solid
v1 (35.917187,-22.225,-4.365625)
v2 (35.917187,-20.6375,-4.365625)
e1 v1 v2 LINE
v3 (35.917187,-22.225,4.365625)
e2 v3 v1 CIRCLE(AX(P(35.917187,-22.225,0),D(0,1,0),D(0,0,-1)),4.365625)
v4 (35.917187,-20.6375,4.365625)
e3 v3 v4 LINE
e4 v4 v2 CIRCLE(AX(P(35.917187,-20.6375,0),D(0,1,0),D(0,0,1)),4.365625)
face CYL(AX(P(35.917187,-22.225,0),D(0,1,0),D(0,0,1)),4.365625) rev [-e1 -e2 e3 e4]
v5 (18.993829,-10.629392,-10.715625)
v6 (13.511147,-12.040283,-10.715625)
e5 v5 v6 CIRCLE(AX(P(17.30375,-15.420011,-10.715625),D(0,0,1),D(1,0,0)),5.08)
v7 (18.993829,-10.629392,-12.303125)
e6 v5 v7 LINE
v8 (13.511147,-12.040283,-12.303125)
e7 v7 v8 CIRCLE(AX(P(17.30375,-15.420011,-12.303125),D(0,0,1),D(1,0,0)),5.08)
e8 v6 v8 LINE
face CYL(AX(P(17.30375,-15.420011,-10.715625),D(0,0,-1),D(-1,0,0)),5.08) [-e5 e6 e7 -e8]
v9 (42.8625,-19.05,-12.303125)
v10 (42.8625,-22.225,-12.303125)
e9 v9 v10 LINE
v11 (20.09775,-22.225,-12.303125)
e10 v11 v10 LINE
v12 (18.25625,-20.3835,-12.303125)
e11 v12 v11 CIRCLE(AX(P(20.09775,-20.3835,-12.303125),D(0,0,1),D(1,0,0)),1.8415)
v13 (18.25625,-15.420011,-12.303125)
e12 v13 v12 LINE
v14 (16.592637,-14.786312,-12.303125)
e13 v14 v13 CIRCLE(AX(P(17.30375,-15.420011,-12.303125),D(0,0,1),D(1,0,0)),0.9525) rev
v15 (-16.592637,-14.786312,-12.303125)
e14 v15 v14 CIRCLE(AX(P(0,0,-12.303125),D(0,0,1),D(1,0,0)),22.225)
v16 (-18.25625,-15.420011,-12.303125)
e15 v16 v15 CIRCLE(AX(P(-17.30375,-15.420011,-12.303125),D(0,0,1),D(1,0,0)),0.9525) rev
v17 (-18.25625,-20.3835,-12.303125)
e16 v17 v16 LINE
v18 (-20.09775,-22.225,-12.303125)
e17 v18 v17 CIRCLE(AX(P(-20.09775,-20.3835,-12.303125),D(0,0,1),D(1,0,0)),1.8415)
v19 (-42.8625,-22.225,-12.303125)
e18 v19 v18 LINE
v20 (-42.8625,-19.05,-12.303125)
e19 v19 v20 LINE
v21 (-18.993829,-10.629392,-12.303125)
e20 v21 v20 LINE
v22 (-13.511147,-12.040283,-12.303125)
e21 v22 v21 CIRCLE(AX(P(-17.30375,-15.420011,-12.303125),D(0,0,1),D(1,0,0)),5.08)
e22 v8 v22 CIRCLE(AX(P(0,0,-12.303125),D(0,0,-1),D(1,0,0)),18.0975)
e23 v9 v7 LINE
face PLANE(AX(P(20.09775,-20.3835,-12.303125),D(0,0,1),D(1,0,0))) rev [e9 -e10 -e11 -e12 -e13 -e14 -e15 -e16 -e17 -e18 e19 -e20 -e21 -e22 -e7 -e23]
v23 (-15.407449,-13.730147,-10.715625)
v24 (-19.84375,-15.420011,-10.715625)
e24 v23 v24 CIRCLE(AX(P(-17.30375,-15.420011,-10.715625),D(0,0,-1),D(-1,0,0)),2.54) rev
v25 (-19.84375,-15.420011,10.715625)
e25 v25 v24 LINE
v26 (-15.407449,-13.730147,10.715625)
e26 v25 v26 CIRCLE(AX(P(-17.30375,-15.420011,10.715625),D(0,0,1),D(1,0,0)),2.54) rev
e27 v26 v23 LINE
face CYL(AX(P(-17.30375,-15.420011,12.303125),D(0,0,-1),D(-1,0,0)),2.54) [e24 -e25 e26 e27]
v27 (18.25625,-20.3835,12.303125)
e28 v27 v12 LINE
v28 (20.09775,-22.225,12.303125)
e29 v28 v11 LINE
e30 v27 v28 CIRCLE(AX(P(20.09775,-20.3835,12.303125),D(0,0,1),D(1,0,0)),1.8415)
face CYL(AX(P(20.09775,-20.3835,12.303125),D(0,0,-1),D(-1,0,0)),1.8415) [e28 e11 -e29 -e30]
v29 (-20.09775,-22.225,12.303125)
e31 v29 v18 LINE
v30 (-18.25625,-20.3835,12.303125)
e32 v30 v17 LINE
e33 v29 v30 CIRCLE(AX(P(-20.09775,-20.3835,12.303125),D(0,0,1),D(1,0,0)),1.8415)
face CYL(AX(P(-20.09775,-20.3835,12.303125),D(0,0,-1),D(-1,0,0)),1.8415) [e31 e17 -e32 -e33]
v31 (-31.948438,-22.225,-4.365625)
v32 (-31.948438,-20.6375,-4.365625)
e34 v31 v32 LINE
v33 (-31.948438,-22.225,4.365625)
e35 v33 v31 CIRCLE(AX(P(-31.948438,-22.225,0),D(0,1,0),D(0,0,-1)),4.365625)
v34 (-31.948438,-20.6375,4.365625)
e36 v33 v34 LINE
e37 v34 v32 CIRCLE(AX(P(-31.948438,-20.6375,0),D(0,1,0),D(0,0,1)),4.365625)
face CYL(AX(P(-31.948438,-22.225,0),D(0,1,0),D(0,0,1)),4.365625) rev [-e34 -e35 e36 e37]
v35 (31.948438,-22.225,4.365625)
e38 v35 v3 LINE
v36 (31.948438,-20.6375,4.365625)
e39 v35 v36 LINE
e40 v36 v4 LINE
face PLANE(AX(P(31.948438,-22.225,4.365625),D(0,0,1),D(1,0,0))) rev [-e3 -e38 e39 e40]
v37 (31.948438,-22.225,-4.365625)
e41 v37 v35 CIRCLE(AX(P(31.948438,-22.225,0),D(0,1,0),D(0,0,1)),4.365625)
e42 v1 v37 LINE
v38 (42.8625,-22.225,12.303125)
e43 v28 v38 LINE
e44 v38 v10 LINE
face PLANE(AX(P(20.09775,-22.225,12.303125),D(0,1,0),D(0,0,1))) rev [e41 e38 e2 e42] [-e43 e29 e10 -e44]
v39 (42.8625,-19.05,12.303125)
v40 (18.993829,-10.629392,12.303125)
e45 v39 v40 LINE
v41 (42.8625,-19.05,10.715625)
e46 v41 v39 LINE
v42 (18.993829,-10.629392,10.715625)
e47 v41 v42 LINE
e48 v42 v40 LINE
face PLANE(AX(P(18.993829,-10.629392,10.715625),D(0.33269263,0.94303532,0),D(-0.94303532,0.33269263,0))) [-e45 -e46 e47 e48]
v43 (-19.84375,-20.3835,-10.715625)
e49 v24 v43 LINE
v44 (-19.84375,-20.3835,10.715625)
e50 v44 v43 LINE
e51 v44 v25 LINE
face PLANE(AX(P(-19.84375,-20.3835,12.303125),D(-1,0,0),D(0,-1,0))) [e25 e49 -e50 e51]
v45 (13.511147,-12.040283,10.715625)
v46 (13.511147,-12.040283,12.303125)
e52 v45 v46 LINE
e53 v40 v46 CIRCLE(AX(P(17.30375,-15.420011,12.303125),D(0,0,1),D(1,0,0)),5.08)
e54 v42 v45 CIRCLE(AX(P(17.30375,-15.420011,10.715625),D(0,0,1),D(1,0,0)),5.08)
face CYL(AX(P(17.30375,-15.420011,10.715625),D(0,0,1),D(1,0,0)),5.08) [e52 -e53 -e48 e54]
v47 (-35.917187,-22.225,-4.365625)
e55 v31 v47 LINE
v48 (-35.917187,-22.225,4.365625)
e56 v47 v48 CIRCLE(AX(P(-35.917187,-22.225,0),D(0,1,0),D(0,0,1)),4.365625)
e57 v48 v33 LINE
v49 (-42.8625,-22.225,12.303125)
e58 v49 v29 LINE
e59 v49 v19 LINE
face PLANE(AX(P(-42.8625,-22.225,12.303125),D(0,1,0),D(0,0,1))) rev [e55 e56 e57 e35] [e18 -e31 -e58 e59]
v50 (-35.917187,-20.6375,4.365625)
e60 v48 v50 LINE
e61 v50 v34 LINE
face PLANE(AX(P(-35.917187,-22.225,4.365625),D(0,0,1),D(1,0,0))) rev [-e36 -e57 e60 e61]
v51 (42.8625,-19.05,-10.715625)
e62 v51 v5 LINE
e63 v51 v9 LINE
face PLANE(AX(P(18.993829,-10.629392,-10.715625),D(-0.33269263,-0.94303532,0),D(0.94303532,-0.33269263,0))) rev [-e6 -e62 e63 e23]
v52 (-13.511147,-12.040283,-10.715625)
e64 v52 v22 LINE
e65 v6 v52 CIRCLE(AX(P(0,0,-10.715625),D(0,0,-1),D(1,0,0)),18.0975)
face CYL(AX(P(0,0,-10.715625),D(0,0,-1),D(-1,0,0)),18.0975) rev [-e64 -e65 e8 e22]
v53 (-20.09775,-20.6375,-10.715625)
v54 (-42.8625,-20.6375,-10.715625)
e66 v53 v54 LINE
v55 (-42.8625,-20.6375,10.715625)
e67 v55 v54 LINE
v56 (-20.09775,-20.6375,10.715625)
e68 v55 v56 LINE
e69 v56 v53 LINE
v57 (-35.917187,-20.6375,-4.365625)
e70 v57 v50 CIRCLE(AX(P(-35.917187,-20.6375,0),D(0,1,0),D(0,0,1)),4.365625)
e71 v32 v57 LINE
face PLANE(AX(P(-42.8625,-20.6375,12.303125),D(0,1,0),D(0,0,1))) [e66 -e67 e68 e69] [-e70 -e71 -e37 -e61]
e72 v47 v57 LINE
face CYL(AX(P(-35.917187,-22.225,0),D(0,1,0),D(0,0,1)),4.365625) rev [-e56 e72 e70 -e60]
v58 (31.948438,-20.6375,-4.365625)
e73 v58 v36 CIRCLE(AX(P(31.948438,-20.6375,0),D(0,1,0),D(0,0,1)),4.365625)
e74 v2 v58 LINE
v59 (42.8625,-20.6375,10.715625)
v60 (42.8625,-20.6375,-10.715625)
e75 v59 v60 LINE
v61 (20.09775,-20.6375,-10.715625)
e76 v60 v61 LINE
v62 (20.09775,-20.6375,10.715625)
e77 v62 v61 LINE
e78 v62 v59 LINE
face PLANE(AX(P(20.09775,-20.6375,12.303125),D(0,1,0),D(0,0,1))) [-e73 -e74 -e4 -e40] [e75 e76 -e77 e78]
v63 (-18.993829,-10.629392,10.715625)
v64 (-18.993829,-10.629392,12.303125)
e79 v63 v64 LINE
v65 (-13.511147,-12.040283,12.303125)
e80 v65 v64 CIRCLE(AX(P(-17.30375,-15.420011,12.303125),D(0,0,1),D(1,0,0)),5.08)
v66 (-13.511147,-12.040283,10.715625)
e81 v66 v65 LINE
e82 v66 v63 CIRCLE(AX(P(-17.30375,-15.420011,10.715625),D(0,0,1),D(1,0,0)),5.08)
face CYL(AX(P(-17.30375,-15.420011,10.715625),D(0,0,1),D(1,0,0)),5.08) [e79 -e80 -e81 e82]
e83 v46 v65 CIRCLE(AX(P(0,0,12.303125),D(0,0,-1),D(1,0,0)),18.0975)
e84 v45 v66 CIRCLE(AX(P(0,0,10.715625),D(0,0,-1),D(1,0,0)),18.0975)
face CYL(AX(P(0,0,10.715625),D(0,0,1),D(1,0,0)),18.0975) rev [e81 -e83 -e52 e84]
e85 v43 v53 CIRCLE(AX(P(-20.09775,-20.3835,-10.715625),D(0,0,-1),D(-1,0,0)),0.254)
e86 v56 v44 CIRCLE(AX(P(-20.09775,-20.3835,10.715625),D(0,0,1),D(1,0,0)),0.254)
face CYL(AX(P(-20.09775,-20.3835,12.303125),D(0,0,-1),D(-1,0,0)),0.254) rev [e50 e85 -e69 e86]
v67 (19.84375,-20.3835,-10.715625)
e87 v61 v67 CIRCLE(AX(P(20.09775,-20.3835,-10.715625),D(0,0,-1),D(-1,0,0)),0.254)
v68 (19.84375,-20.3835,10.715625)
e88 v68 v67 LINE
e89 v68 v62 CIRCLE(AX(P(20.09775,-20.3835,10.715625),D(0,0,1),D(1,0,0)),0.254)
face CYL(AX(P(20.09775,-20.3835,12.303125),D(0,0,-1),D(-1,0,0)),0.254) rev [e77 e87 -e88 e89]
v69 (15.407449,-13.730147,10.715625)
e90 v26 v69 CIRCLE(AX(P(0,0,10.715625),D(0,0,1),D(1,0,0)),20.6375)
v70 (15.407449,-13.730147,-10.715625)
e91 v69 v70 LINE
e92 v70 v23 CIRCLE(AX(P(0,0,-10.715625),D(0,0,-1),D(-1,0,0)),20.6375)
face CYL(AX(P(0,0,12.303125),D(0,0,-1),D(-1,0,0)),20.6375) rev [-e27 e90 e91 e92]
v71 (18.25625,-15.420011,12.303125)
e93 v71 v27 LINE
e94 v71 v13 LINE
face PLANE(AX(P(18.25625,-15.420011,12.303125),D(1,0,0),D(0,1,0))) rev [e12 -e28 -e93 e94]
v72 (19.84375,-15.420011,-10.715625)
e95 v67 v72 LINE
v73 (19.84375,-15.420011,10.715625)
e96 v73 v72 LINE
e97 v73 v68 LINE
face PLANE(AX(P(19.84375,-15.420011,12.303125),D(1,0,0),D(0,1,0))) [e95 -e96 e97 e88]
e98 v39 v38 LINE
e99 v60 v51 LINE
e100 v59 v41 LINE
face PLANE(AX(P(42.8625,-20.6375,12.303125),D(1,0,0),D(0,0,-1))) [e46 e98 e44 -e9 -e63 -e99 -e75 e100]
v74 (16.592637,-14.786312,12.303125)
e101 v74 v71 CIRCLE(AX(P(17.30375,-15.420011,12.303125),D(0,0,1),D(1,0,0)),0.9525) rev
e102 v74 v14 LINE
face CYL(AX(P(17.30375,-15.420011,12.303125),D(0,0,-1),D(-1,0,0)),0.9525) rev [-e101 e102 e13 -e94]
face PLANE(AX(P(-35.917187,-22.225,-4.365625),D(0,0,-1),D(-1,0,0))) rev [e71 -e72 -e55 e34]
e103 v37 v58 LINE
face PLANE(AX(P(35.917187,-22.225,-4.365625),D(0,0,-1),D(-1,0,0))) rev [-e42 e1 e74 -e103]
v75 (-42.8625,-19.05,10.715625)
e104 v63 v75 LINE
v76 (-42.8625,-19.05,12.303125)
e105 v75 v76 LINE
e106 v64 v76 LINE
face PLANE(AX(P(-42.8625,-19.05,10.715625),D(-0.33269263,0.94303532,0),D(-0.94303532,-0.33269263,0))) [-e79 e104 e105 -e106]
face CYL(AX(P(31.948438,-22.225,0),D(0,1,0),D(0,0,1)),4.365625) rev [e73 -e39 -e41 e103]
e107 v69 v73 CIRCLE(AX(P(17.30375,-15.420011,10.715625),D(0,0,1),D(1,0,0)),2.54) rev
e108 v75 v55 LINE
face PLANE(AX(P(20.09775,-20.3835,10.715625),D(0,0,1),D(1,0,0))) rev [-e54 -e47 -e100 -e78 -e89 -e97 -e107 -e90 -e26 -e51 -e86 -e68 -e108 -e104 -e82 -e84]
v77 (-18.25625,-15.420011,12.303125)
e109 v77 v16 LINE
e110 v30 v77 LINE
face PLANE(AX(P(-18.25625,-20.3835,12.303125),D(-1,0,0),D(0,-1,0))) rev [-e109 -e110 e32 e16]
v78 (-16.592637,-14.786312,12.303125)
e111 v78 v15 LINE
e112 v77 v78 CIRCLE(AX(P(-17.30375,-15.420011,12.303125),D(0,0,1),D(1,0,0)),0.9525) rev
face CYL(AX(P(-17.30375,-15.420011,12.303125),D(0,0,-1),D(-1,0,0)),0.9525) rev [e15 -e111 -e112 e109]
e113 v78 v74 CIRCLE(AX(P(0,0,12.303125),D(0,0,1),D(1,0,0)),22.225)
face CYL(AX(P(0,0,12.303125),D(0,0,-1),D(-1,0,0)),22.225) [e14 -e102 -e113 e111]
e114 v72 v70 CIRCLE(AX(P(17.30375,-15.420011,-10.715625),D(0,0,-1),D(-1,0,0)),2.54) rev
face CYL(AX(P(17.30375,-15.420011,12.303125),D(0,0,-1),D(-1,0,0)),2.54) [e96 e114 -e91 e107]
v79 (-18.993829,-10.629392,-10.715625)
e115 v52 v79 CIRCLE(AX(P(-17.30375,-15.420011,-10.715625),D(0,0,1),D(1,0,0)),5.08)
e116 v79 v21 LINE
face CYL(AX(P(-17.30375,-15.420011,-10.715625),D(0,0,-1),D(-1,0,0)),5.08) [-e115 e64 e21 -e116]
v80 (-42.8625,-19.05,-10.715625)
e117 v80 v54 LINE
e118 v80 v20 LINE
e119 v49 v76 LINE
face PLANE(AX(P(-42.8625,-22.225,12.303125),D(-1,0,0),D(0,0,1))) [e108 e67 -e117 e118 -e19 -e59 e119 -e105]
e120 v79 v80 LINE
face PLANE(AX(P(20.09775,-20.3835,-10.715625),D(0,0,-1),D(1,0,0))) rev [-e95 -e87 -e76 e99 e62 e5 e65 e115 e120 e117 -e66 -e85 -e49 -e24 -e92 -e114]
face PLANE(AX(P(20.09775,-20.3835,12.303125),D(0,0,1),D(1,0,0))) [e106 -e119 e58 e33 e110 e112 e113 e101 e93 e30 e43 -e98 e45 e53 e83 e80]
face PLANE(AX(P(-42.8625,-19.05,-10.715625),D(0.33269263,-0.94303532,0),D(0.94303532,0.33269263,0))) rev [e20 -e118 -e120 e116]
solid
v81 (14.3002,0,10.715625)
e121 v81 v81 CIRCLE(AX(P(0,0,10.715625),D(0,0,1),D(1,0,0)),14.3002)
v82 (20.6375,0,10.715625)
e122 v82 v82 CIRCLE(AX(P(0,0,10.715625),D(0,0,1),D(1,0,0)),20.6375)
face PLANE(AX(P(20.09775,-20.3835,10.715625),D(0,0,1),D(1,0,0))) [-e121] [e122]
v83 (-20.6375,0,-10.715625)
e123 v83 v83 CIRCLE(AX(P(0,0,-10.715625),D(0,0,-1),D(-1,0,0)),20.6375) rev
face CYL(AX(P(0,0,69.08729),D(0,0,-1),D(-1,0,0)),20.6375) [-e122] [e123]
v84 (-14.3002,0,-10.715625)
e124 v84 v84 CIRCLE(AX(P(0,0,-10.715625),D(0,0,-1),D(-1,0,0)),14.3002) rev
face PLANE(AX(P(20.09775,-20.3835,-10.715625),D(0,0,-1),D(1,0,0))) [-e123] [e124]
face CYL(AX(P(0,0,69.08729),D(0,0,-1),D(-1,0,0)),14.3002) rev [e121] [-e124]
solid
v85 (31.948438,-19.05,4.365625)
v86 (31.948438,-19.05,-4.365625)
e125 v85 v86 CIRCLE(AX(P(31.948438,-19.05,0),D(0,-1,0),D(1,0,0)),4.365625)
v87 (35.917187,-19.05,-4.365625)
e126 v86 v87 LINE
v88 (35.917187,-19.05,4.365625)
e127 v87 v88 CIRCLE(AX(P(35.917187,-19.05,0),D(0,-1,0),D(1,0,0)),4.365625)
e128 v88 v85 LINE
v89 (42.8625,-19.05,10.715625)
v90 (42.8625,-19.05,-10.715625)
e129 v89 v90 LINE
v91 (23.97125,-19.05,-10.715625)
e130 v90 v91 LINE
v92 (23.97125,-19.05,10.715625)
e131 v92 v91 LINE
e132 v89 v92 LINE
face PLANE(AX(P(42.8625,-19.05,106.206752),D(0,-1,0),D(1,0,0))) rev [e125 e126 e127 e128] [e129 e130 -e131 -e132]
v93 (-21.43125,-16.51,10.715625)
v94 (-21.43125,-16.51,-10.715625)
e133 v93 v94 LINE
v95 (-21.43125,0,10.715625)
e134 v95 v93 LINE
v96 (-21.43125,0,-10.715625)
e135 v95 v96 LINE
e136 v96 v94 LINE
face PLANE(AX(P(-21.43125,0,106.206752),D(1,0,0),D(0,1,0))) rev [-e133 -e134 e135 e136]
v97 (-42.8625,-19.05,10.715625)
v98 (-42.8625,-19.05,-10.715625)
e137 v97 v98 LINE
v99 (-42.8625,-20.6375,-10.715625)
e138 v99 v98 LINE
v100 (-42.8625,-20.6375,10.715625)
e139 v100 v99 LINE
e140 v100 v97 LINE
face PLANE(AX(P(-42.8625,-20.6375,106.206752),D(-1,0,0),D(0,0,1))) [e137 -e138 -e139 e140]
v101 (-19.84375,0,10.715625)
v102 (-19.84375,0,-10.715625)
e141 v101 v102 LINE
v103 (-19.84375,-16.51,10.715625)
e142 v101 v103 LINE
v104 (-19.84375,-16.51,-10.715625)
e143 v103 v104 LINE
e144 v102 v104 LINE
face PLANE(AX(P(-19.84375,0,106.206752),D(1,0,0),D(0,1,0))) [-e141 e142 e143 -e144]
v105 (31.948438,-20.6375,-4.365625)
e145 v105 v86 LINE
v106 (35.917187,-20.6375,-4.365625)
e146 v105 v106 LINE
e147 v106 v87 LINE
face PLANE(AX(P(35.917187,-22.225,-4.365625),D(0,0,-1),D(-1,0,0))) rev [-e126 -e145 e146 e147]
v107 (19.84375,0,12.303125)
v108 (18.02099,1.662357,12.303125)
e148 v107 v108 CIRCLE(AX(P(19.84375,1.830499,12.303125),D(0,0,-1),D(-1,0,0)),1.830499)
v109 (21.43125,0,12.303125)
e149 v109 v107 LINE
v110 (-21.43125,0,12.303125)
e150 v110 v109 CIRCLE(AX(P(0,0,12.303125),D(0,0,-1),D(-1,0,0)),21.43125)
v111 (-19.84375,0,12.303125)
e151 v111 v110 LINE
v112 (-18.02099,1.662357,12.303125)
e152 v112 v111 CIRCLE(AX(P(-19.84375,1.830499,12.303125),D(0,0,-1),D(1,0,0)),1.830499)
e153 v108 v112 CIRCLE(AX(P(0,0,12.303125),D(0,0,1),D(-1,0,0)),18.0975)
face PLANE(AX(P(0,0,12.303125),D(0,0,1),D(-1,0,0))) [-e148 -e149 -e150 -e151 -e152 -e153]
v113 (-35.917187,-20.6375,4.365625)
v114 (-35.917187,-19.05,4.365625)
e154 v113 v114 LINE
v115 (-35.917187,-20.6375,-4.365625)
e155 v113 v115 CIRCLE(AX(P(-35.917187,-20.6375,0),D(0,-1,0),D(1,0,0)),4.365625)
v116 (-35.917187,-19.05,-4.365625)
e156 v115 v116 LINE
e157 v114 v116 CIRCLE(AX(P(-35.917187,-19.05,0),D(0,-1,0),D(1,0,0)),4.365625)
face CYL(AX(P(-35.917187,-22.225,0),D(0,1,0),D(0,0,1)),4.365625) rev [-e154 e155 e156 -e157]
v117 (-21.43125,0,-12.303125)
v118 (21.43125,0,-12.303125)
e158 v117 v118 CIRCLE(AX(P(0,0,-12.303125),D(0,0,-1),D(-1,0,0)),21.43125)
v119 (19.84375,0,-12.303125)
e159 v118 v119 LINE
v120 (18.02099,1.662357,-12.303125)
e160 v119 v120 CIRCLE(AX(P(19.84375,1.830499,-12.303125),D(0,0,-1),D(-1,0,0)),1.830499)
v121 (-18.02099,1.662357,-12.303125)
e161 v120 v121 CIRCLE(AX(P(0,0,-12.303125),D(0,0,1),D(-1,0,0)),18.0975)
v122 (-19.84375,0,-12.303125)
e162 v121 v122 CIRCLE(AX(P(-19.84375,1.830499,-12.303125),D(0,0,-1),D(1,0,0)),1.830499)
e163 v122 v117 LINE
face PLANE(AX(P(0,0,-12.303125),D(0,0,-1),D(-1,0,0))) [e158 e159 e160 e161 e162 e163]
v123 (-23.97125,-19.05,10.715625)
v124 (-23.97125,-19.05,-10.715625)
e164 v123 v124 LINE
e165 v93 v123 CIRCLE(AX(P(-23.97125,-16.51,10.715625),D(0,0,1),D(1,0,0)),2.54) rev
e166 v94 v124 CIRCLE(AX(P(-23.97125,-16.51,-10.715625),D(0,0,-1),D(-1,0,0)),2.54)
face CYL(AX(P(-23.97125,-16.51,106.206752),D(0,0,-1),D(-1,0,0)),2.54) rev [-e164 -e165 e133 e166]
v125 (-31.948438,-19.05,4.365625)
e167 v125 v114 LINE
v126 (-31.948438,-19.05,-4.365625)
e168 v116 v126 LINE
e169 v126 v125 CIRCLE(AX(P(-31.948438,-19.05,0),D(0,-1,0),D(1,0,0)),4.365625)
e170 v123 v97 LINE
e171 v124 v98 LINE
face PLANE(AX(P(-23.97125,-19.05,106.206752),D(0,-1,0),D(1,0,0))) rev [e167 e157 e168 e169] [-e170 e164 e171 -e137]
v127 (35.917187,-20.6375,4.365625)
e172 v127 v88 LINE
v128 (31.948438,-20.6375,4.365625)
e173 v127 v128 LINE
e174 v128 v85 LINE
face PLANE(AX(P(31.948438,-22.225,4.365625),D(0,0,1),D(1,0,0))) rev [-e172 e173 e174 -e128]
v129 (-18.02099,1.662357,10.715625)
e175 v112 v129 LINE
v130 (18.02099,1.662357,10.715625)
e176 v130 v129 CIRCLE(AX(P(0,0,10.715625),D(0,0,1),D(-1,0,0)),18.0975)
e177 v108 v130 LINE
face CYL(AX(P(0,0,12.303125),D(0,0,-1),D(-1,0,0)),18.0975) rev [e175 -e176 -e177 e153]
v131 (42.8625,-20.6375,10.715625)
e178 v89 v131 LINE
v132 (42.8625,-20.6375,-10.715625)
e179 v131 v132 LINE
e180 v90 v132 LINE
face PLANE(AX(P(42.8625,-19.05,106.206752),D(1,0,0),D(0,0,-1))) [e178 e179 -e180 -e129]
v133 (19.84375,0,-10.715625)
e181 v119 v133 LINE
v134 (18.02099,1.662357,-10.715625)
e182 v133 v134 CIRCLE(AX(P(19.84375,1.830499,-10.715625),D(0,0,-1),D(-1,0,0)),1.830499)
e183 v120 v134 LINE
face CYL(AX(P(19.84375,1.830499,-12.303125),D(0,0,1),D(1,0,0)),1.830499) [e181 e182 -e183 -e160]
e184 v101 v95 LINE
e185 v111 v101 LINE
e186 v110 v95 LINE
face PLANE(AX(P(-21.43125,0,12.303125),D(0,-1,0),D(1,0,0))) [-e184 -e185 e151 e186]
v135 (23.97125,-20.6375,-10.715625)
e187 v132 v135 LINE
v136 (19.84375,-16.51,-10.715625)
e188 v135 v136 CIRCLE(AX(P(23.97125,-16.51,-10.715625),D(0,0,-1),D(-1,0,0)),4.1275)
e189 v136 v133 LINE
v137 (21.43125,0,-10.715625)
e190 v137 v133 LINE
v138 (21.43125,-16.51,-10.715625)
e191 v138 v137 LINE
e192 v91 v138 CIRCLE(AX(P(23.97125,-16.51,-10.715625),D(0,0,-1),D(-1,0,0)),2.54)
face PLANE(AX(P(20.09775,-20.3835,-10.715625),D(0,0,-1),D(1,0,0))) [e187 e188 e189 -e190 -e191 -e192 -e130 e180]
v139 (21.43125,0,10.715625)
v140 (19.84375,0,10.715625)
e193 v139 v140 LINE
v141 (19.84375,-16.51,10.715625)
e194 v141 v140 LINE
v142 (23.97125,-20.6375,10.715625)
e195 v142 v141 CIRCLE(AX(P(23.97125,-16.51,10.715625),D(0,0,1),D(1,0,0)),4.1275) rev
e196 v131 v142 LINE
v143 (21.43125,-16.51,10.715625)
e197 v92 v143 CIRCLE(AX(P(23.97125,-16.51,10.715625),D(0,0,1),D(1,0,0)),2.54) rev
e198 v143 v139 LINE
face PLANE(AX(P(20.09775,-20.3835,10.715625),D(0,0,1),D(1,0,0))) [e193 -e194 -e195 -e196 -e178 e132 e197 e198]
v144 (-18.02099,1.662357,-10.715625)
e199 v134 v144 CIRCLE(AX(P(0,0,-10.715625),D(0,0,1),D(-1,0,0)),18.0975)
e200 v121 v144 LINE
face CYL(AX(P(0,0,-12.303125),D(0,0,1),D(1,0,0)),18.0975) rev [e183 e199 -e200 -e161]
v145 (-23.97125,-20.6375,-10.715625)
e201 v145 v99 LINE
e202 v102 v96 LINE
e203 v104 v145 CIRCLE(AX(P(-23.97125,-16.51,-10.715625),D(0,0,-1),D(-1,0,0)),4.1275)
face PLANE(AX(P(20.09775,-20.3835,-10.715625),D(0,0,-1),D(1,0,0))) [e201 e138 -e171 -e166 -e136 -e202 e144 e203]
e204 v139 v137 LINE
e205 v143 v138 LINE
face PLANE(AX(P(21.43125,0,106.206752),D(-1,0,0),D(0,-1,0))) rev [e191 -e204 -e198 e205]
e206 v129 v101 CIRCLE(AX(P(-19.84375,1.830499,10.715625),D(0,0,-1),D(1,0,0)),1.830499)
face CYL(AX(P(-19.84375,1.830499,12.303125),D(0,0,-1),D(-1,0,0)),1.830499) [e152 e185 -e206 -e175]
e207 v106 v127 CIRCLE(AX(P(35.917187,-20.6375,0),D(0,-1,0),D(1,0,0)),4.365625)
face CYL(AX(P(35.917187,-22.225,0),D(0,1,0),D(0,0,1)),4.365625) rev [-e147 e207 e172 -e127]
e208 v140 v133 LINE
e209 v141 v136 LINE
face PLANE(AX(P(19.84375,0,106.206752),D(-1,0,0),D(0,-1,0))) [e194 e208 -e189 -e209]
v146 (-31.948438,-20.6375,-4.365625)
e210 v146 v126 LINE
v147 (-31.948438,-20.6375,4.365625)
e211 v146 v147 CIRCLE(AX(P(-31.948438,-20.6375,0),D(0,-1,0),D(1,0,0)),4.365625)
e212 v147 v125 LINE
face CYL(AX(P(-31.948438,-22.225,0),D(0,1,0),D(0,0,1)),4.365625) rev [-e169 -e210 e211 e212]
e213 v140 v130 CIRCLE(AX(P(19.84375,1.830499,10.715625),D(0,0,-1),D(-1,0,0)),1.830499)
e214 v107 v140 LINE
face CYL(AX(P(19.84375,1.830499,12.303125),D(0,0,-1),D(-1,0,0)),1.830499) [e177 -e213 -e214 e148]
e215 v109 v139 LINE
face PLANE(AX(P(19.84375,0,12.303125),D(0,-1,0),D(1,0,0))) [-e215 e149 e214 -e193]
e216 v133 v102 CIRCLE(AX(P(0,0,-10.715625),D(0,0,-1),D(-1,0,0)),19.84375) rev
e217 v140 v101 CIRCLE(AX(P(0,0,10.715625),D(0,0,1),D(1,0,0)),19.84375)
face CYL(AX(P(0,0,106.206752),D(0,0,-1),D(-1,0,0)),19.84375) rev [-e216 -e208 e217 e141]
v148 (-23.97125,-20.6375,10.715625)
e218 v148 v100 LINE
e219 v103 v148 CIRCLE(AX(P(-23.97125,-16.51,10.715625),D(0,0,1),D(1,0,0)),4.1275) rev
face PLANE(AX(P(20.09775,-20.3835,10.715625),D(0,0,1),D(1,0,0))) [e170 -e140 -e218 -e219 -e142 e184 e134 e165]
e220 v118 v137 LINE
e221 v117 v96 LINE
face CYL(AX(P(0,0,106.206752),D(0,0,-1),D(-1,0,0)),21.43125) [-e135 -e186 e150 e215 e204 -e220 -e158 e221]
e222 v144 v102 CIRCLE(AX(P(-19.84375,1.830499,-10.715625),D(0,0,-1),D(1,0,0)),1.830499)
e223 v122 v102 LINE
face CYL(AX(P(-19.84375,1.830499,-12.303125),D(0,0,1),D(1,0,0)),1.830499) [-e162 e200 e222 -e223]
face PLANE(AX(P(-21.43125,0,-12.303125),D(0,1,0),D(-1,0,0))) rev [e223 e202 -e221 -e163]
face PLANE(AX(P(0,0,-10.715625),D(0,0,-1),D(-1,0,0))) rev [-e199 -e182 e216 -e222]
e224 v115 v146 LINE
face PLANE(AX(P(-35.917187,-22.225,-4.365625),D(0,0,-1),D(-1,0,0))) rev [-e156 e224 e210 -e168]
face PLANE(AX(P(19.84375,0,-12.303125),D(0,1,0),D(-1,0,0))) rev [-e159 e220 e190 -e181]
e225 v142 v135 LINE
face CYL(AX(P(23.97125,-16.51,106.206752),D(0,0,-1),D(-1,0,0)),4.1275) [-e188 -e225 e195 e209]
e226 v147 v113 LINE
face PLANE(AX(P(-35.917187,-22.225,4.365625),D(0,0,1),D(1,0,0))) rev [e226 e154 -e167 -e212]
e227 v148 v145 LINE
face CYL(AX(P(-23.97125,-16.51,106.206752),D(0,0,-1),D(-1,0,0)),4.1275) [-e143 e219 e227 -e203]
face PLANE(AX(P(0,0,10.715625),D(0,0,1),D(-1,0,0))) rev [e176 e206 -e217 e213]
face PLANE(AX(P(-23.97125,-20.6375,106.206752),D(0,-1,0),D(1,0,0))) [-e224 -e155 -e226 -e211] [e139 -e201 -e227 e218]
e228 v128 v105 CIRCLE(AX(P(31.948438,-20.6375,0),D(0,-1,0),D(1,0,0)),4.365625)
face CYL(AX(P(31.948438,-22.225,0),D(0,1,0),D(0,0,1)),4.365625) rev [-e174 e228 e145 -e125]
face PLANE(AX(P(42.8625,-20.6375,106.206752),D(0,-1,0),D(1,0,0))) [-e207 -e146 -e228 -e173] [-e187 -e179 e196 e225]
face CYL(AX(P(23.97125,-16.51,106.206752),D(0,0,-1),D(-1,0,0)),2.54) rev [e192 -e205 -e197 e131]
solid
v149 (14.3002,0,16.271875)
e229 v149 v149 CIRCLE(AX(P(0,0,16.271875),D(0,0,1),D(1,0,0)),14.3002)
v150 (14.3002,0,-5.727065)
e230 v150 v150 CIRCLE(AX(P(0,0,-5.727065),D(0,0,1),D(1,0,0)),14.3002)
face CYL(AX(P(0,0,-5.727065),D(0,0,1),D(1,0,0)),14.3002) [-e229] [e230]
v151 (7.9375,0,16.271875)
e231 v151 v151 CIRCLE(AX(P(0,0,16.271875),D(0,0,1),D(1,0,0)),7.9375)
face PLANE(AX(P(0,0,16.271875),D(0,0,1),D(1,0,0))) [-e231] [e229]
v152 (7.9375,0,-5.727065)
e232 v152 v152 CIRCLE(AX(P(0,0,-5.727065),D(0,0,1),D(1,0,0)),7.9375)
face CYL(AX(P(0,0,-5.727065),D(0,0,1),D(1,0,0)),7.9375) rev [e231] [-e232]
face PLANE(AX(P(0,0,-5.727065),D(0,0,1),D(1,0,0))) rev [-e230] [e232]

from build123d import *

# Parameters (mm, degrees)
EXTRUDE_THIN2_DEPTH  = 12.303125
EXTRUDE1_DEPTH       = 1.5875
EXTRUDE_THIN3_START  = -10.715625
EXTRUDE_THIN3_DEPTH  = 21.43125
EXTRUDE2_DEPTH       = 1.5875
EXTRUDE3_START       = -10.715625
EXTRUDE3_OUTLINE_R   = 20.6375
EXTRUDE3_OUTLINE_R_2 = 14.3002
EXTRUDE3_DEPTH       = 21.43125
SKETCH8_R            = 14.3002
SKETCH8_R_2          = 7.9375
EXTRUDE4_DEPTH       = 21.99894
CUT_EXTRUDE1_DEPTH   = 51.950156499


# Read off the part's stored shape, not the designer's step: Extrude-Thin3, Extrude3
with BuildPart() as part:
    # Sketch1 → Extrude-Thin2 (new, symmetric)
    with BuildSketch(Plane.XY):
        with BuildLine():
            Line((-42.8625, -20.6375), (-20.09775, -20.6375))
            ThreePointArc((-20.09775, -20.6375), (-19.918144878, -20.563105122), (-19.84375, -20.3835))
            Line((-19.84375, -20.3835), (-19.84375, -15.420011096))
            ThreePointArc((-19.84375, -15.420011096), (-18.207905551, -13.0463846), (-15.40744863, -13.730146866))
            ThreePointArc((-15.40744863, -13.730146866), (0, -20.6375), (15.40744863, -13.730146866))
            ThreePointArc((15.40744863, -13.730146866), (18.207905551, -13.0463846), (19.84375, -15.420011096))
            Line((19.84375, -15.420011096), (19.84375, -20.3835))
            ThreePointArc((19.84375, -20.3835), (19.918144878, -20.563105122), (20.09775, -20.6375))
            Line((20.09775, -20.6375), (42.8625, -20.6375))
            Line((42.8625, -20.6375), (42.8625, -22.225))
            Line((42.8625, -22.225), (20.09775, -22.225))
            ThreePointArc((20.09775, -22.225), (18.795612862, -21.685637138), (18.25625, -20.3835))
            Line((18.25625, -20.3835), (18.25625, -15.420011096))
            ThreePointArc((18.25625, -15.420011096), (17.642808332, -14.52990116), (16.592636986, -14.786312009))
            ThreePointArc((16.592636986, -14.786312009), (0, -22.225), (-16.592636986, -14.786312009))
            ThreePointArc((-16.592636986, -14.786312009), (-17.642808332, -14.52990116), (-18.25625, -15.420011096))
            Line((-18.25625, -15.420011096), (-18.25625, -20.3835))
            ThreePointArc((-18.25625, -20.3835), (-18.795612862, -21.685637138), (-20.09775, -22.225))
            Line((-20.09775, -22.225), (-42.8625, -22.225))
            Line((-42.8625, -22.225), (-42.8625, -20.6375))
        make_face()
    extrude(amount=EXTRUDE_THIN2_DEPTH, both=True)

    # Sketch4 → Extrude1 (add)
    with BuildSketch(Plane.XY.offset(12.303125)):
        with BuildLine():
            Line((-42.8625, -19.05), (-18.993828558, -10.629391671))
            ThreePointArc((-18.993828558, -10.629391671), (-16.037730525, -10.500296197), (-13.51114726, -12.040282636))
            ThreePointArc((-13.51114726, -12.040282636), (0, -18.0975), (13.51114726, -12.040282636))
            ThreePointArc((13.51114726, -12.040282636), (16.037730525, -10.500296197), (18.993828558, -10.629391671))
            Line((18.993828558, -10.629391671), (42.8625, -19.05))
            Line((42.8625, -19.05), (42.8625, -22.225))
            Line((42.8625, -22.225), (20.09775, -22.225))
            ThreePointArc((20.09775, -22.225), (18.795612862, -21.685637138), (18.25625, -20.3835))
            Line((18.25625, -20.3835), (18.25625, -15.420011096))
            ThreePointArc((18.25625, -15.420011096), (17.642808332, -14.52990116), (16.592636986, -14.786312009))
            ThreePointArc((16.592636986, -14.786312009), (0, -22.225), (-16.592636986, -14.786312009))
            ThreePointArc((-16.592636986, -14.786312009), (-17.642808332, -14.52990116), (-18.25625, -15.420011096))
            Line((-18.25625, -15.420011096), (-18.25625, -20.3835))
            ThreePointArc((-18.25625, -20.3835), (-18.795612862, -21.685637138), (-20.09775, -22.225))
            Line((-20.09775, -22.225), (-42.8625, -22.225))
            Line((-42.8625, -22.225), (-42.8625, -19.05))
        make_face()
    extrude1 = extrude(amount=-EXTRUDE1_DEPTH)

    # Mirror1: Extrude1 across plane
    add(extrude1.mirror(Plane.XY))


with BuildPart() as body_2:
    # Extrude-Thin3 outline → Extrude-Thin3 (new body)
    with BuildSketch(Plane.XY.offset(EXTRUDE_THIN3_START)):
        with BuildLine():
            Line((-23.97125, -19.05), (-42.8625, -19.05))
            Line((-42.8625, -19.05), (-42.8625, -20.6375))
            Line((-42.8625, -20.6375), (-23.97125, -20.6375))
            ThreePointArc((-23.97125, -20.6375), (-21.052666761, -19.428583239), (-19.84375, -16.51))
            Line((-19.84375, -16.51), (-19.84375, 0))
            ThreePointArc((-19.84375, 0), (0, 19.84375), (19.84375, 0))
            Line((19.84375, 0), (19.84375, -16.51))
            ThreePointArc((19.84375, -16.51), (21.052666761, -19.428583239), (23.97125, -20.6375))
            Line((23.97125, -20.6375), (42.8625, -20.6375))
            Line((42.8625, -20.6375), (42.8625, -19.05))
            Line((42.8625, -19.05), (23.97125, -19.05))
            ThreePointArc((23.97125, -19.05), (22.175198776, -18.306051224), (21.43125, -16.51))
            Line((21.43125, -16.51), (21.43125, 0))
            ThreePointArc((21.43125, 0), (0, 21.43125), (-21.43125, 0))
            Line((-21.43125, 0), (-21.43125, -16.51))
            ThreePointArc((-21.43125, -16.51), (-22.175198776, -18.306051224), (-23.97125, -19.05))
        make_face()
    extrude(amount=EXTRUDE_THIN3_DEPTH)

    # Sketch6 → Extrude2 (add)
    with BuildSketch(Plane(origin=(0, 0, -10.715625), x_dir=(-1, 0, 0), z_dir=(0, 0, -1))):
        with BuildLine():
            Line((-19.84375, 0), (-21.43125, 0))
            ThreePointArc((-21.43125, 0), (0, 21.43125), (21.43125, 0))
            Line((21.43125, 0), (19.84375, 0))
            ThreePointArc((19.84375, 0), (18.610270538, 0.477999494), (18.020989833, 1.662357273))
            ThreePointArc((18.020989833, 1.662357273), (0, 18.0975), (-18.020989833, 1.662357273))
            ThreePointArc((-18.020989833, 1.662357273), (-18.610270538, 0.477999494), (-19.84375, 0))
        make_face()
    extrude2 = extrude(amount=EXTRUDE2_DEPTH)

    # Mirror2: Extrude2 across plane
    add(extrude2.mirror(Plane.XY))


with BuildPart() as body_3:
    # Extrude3 outline → Extrude3 (new body)
    with BuildSketch(Plane.XY.offset(EXTRUDE3_START)):
        Circle(EXTRUDE3_OUTLINE_R)
        Circle(EXTRUDE3_OUTLINE_R_2, mode=Mode.SUBTRACT)
    extrude(amount=EXTRUDE3_DEPTH)


with BuildPart() as body_4:
    # Sketch8 → Extrude4 (new body)
    with BuildSketch(Plane.XY.offset(16.271875)):
        Circle(SKETCH8_R)
        Circle(SKETCH8_R_2, mode=Mode.SUBTRACT)
    extrude(amount=-EXTRUDE4_DEPTH)


with BuildPart() as cut_extrude1_tool:
    # Sketch3 → Cut-Extrude1 (new, through all)
    with BuildSketch(Plane(origin=(0, 0, 0), x_dir=(1, 0, 0), z_dir=(0, 1, 0))):
        with BuildLine():
            Line((-35.9171875, 4.365625), (-31.9484375, 4.365625))
            ThreePointArc((-31.9484375, 4.365625), (-27.5828125, 0), (-31.9484375, -4.365625))
            Line((-31.9484375, -4.365625), (-35.9171875, -4.365625))
            ThreePointArc((-35.9171875, -4.365625), (-40.2828125, 0), (-35.9171875, 4.365625))
        make_face()
        with BuildLine():
            Line((31.9484375, -4.365625), (35.9171875, -4.365625))
            ThreePointArc((35.9171875, -4.365625), (40.2828125, 0), (35.9171875, 4.365625))
            Line((35.9171875, 4.365625), (31.9484375, 4.365625))
            ThreePointArc((31.9484375, 4.365625), (27.5828125, 0), (31.9484375, -4.365625))
        make_face()
    extrude(amount=-CUT_EXTRUDE1_DEPTH)


with BuildPart() as part_1:
    add(part.part)

    # Cut-Extrude1: cut by cut_extrude1_tool
    add(cut_extrude1_tool.part, mode=Mode.SUBTRACT)


with BuildPart() as body_2_1:
    add(body_2.part)

    # Cut-Extrude1: cut by cut_extrude1_tool
    add(cut_extrude1_tool.part, mode=Mode.SUBTRACT)


solid = Compound([body_3.part, body_4.part, part_1.part, body_2_1.part])
